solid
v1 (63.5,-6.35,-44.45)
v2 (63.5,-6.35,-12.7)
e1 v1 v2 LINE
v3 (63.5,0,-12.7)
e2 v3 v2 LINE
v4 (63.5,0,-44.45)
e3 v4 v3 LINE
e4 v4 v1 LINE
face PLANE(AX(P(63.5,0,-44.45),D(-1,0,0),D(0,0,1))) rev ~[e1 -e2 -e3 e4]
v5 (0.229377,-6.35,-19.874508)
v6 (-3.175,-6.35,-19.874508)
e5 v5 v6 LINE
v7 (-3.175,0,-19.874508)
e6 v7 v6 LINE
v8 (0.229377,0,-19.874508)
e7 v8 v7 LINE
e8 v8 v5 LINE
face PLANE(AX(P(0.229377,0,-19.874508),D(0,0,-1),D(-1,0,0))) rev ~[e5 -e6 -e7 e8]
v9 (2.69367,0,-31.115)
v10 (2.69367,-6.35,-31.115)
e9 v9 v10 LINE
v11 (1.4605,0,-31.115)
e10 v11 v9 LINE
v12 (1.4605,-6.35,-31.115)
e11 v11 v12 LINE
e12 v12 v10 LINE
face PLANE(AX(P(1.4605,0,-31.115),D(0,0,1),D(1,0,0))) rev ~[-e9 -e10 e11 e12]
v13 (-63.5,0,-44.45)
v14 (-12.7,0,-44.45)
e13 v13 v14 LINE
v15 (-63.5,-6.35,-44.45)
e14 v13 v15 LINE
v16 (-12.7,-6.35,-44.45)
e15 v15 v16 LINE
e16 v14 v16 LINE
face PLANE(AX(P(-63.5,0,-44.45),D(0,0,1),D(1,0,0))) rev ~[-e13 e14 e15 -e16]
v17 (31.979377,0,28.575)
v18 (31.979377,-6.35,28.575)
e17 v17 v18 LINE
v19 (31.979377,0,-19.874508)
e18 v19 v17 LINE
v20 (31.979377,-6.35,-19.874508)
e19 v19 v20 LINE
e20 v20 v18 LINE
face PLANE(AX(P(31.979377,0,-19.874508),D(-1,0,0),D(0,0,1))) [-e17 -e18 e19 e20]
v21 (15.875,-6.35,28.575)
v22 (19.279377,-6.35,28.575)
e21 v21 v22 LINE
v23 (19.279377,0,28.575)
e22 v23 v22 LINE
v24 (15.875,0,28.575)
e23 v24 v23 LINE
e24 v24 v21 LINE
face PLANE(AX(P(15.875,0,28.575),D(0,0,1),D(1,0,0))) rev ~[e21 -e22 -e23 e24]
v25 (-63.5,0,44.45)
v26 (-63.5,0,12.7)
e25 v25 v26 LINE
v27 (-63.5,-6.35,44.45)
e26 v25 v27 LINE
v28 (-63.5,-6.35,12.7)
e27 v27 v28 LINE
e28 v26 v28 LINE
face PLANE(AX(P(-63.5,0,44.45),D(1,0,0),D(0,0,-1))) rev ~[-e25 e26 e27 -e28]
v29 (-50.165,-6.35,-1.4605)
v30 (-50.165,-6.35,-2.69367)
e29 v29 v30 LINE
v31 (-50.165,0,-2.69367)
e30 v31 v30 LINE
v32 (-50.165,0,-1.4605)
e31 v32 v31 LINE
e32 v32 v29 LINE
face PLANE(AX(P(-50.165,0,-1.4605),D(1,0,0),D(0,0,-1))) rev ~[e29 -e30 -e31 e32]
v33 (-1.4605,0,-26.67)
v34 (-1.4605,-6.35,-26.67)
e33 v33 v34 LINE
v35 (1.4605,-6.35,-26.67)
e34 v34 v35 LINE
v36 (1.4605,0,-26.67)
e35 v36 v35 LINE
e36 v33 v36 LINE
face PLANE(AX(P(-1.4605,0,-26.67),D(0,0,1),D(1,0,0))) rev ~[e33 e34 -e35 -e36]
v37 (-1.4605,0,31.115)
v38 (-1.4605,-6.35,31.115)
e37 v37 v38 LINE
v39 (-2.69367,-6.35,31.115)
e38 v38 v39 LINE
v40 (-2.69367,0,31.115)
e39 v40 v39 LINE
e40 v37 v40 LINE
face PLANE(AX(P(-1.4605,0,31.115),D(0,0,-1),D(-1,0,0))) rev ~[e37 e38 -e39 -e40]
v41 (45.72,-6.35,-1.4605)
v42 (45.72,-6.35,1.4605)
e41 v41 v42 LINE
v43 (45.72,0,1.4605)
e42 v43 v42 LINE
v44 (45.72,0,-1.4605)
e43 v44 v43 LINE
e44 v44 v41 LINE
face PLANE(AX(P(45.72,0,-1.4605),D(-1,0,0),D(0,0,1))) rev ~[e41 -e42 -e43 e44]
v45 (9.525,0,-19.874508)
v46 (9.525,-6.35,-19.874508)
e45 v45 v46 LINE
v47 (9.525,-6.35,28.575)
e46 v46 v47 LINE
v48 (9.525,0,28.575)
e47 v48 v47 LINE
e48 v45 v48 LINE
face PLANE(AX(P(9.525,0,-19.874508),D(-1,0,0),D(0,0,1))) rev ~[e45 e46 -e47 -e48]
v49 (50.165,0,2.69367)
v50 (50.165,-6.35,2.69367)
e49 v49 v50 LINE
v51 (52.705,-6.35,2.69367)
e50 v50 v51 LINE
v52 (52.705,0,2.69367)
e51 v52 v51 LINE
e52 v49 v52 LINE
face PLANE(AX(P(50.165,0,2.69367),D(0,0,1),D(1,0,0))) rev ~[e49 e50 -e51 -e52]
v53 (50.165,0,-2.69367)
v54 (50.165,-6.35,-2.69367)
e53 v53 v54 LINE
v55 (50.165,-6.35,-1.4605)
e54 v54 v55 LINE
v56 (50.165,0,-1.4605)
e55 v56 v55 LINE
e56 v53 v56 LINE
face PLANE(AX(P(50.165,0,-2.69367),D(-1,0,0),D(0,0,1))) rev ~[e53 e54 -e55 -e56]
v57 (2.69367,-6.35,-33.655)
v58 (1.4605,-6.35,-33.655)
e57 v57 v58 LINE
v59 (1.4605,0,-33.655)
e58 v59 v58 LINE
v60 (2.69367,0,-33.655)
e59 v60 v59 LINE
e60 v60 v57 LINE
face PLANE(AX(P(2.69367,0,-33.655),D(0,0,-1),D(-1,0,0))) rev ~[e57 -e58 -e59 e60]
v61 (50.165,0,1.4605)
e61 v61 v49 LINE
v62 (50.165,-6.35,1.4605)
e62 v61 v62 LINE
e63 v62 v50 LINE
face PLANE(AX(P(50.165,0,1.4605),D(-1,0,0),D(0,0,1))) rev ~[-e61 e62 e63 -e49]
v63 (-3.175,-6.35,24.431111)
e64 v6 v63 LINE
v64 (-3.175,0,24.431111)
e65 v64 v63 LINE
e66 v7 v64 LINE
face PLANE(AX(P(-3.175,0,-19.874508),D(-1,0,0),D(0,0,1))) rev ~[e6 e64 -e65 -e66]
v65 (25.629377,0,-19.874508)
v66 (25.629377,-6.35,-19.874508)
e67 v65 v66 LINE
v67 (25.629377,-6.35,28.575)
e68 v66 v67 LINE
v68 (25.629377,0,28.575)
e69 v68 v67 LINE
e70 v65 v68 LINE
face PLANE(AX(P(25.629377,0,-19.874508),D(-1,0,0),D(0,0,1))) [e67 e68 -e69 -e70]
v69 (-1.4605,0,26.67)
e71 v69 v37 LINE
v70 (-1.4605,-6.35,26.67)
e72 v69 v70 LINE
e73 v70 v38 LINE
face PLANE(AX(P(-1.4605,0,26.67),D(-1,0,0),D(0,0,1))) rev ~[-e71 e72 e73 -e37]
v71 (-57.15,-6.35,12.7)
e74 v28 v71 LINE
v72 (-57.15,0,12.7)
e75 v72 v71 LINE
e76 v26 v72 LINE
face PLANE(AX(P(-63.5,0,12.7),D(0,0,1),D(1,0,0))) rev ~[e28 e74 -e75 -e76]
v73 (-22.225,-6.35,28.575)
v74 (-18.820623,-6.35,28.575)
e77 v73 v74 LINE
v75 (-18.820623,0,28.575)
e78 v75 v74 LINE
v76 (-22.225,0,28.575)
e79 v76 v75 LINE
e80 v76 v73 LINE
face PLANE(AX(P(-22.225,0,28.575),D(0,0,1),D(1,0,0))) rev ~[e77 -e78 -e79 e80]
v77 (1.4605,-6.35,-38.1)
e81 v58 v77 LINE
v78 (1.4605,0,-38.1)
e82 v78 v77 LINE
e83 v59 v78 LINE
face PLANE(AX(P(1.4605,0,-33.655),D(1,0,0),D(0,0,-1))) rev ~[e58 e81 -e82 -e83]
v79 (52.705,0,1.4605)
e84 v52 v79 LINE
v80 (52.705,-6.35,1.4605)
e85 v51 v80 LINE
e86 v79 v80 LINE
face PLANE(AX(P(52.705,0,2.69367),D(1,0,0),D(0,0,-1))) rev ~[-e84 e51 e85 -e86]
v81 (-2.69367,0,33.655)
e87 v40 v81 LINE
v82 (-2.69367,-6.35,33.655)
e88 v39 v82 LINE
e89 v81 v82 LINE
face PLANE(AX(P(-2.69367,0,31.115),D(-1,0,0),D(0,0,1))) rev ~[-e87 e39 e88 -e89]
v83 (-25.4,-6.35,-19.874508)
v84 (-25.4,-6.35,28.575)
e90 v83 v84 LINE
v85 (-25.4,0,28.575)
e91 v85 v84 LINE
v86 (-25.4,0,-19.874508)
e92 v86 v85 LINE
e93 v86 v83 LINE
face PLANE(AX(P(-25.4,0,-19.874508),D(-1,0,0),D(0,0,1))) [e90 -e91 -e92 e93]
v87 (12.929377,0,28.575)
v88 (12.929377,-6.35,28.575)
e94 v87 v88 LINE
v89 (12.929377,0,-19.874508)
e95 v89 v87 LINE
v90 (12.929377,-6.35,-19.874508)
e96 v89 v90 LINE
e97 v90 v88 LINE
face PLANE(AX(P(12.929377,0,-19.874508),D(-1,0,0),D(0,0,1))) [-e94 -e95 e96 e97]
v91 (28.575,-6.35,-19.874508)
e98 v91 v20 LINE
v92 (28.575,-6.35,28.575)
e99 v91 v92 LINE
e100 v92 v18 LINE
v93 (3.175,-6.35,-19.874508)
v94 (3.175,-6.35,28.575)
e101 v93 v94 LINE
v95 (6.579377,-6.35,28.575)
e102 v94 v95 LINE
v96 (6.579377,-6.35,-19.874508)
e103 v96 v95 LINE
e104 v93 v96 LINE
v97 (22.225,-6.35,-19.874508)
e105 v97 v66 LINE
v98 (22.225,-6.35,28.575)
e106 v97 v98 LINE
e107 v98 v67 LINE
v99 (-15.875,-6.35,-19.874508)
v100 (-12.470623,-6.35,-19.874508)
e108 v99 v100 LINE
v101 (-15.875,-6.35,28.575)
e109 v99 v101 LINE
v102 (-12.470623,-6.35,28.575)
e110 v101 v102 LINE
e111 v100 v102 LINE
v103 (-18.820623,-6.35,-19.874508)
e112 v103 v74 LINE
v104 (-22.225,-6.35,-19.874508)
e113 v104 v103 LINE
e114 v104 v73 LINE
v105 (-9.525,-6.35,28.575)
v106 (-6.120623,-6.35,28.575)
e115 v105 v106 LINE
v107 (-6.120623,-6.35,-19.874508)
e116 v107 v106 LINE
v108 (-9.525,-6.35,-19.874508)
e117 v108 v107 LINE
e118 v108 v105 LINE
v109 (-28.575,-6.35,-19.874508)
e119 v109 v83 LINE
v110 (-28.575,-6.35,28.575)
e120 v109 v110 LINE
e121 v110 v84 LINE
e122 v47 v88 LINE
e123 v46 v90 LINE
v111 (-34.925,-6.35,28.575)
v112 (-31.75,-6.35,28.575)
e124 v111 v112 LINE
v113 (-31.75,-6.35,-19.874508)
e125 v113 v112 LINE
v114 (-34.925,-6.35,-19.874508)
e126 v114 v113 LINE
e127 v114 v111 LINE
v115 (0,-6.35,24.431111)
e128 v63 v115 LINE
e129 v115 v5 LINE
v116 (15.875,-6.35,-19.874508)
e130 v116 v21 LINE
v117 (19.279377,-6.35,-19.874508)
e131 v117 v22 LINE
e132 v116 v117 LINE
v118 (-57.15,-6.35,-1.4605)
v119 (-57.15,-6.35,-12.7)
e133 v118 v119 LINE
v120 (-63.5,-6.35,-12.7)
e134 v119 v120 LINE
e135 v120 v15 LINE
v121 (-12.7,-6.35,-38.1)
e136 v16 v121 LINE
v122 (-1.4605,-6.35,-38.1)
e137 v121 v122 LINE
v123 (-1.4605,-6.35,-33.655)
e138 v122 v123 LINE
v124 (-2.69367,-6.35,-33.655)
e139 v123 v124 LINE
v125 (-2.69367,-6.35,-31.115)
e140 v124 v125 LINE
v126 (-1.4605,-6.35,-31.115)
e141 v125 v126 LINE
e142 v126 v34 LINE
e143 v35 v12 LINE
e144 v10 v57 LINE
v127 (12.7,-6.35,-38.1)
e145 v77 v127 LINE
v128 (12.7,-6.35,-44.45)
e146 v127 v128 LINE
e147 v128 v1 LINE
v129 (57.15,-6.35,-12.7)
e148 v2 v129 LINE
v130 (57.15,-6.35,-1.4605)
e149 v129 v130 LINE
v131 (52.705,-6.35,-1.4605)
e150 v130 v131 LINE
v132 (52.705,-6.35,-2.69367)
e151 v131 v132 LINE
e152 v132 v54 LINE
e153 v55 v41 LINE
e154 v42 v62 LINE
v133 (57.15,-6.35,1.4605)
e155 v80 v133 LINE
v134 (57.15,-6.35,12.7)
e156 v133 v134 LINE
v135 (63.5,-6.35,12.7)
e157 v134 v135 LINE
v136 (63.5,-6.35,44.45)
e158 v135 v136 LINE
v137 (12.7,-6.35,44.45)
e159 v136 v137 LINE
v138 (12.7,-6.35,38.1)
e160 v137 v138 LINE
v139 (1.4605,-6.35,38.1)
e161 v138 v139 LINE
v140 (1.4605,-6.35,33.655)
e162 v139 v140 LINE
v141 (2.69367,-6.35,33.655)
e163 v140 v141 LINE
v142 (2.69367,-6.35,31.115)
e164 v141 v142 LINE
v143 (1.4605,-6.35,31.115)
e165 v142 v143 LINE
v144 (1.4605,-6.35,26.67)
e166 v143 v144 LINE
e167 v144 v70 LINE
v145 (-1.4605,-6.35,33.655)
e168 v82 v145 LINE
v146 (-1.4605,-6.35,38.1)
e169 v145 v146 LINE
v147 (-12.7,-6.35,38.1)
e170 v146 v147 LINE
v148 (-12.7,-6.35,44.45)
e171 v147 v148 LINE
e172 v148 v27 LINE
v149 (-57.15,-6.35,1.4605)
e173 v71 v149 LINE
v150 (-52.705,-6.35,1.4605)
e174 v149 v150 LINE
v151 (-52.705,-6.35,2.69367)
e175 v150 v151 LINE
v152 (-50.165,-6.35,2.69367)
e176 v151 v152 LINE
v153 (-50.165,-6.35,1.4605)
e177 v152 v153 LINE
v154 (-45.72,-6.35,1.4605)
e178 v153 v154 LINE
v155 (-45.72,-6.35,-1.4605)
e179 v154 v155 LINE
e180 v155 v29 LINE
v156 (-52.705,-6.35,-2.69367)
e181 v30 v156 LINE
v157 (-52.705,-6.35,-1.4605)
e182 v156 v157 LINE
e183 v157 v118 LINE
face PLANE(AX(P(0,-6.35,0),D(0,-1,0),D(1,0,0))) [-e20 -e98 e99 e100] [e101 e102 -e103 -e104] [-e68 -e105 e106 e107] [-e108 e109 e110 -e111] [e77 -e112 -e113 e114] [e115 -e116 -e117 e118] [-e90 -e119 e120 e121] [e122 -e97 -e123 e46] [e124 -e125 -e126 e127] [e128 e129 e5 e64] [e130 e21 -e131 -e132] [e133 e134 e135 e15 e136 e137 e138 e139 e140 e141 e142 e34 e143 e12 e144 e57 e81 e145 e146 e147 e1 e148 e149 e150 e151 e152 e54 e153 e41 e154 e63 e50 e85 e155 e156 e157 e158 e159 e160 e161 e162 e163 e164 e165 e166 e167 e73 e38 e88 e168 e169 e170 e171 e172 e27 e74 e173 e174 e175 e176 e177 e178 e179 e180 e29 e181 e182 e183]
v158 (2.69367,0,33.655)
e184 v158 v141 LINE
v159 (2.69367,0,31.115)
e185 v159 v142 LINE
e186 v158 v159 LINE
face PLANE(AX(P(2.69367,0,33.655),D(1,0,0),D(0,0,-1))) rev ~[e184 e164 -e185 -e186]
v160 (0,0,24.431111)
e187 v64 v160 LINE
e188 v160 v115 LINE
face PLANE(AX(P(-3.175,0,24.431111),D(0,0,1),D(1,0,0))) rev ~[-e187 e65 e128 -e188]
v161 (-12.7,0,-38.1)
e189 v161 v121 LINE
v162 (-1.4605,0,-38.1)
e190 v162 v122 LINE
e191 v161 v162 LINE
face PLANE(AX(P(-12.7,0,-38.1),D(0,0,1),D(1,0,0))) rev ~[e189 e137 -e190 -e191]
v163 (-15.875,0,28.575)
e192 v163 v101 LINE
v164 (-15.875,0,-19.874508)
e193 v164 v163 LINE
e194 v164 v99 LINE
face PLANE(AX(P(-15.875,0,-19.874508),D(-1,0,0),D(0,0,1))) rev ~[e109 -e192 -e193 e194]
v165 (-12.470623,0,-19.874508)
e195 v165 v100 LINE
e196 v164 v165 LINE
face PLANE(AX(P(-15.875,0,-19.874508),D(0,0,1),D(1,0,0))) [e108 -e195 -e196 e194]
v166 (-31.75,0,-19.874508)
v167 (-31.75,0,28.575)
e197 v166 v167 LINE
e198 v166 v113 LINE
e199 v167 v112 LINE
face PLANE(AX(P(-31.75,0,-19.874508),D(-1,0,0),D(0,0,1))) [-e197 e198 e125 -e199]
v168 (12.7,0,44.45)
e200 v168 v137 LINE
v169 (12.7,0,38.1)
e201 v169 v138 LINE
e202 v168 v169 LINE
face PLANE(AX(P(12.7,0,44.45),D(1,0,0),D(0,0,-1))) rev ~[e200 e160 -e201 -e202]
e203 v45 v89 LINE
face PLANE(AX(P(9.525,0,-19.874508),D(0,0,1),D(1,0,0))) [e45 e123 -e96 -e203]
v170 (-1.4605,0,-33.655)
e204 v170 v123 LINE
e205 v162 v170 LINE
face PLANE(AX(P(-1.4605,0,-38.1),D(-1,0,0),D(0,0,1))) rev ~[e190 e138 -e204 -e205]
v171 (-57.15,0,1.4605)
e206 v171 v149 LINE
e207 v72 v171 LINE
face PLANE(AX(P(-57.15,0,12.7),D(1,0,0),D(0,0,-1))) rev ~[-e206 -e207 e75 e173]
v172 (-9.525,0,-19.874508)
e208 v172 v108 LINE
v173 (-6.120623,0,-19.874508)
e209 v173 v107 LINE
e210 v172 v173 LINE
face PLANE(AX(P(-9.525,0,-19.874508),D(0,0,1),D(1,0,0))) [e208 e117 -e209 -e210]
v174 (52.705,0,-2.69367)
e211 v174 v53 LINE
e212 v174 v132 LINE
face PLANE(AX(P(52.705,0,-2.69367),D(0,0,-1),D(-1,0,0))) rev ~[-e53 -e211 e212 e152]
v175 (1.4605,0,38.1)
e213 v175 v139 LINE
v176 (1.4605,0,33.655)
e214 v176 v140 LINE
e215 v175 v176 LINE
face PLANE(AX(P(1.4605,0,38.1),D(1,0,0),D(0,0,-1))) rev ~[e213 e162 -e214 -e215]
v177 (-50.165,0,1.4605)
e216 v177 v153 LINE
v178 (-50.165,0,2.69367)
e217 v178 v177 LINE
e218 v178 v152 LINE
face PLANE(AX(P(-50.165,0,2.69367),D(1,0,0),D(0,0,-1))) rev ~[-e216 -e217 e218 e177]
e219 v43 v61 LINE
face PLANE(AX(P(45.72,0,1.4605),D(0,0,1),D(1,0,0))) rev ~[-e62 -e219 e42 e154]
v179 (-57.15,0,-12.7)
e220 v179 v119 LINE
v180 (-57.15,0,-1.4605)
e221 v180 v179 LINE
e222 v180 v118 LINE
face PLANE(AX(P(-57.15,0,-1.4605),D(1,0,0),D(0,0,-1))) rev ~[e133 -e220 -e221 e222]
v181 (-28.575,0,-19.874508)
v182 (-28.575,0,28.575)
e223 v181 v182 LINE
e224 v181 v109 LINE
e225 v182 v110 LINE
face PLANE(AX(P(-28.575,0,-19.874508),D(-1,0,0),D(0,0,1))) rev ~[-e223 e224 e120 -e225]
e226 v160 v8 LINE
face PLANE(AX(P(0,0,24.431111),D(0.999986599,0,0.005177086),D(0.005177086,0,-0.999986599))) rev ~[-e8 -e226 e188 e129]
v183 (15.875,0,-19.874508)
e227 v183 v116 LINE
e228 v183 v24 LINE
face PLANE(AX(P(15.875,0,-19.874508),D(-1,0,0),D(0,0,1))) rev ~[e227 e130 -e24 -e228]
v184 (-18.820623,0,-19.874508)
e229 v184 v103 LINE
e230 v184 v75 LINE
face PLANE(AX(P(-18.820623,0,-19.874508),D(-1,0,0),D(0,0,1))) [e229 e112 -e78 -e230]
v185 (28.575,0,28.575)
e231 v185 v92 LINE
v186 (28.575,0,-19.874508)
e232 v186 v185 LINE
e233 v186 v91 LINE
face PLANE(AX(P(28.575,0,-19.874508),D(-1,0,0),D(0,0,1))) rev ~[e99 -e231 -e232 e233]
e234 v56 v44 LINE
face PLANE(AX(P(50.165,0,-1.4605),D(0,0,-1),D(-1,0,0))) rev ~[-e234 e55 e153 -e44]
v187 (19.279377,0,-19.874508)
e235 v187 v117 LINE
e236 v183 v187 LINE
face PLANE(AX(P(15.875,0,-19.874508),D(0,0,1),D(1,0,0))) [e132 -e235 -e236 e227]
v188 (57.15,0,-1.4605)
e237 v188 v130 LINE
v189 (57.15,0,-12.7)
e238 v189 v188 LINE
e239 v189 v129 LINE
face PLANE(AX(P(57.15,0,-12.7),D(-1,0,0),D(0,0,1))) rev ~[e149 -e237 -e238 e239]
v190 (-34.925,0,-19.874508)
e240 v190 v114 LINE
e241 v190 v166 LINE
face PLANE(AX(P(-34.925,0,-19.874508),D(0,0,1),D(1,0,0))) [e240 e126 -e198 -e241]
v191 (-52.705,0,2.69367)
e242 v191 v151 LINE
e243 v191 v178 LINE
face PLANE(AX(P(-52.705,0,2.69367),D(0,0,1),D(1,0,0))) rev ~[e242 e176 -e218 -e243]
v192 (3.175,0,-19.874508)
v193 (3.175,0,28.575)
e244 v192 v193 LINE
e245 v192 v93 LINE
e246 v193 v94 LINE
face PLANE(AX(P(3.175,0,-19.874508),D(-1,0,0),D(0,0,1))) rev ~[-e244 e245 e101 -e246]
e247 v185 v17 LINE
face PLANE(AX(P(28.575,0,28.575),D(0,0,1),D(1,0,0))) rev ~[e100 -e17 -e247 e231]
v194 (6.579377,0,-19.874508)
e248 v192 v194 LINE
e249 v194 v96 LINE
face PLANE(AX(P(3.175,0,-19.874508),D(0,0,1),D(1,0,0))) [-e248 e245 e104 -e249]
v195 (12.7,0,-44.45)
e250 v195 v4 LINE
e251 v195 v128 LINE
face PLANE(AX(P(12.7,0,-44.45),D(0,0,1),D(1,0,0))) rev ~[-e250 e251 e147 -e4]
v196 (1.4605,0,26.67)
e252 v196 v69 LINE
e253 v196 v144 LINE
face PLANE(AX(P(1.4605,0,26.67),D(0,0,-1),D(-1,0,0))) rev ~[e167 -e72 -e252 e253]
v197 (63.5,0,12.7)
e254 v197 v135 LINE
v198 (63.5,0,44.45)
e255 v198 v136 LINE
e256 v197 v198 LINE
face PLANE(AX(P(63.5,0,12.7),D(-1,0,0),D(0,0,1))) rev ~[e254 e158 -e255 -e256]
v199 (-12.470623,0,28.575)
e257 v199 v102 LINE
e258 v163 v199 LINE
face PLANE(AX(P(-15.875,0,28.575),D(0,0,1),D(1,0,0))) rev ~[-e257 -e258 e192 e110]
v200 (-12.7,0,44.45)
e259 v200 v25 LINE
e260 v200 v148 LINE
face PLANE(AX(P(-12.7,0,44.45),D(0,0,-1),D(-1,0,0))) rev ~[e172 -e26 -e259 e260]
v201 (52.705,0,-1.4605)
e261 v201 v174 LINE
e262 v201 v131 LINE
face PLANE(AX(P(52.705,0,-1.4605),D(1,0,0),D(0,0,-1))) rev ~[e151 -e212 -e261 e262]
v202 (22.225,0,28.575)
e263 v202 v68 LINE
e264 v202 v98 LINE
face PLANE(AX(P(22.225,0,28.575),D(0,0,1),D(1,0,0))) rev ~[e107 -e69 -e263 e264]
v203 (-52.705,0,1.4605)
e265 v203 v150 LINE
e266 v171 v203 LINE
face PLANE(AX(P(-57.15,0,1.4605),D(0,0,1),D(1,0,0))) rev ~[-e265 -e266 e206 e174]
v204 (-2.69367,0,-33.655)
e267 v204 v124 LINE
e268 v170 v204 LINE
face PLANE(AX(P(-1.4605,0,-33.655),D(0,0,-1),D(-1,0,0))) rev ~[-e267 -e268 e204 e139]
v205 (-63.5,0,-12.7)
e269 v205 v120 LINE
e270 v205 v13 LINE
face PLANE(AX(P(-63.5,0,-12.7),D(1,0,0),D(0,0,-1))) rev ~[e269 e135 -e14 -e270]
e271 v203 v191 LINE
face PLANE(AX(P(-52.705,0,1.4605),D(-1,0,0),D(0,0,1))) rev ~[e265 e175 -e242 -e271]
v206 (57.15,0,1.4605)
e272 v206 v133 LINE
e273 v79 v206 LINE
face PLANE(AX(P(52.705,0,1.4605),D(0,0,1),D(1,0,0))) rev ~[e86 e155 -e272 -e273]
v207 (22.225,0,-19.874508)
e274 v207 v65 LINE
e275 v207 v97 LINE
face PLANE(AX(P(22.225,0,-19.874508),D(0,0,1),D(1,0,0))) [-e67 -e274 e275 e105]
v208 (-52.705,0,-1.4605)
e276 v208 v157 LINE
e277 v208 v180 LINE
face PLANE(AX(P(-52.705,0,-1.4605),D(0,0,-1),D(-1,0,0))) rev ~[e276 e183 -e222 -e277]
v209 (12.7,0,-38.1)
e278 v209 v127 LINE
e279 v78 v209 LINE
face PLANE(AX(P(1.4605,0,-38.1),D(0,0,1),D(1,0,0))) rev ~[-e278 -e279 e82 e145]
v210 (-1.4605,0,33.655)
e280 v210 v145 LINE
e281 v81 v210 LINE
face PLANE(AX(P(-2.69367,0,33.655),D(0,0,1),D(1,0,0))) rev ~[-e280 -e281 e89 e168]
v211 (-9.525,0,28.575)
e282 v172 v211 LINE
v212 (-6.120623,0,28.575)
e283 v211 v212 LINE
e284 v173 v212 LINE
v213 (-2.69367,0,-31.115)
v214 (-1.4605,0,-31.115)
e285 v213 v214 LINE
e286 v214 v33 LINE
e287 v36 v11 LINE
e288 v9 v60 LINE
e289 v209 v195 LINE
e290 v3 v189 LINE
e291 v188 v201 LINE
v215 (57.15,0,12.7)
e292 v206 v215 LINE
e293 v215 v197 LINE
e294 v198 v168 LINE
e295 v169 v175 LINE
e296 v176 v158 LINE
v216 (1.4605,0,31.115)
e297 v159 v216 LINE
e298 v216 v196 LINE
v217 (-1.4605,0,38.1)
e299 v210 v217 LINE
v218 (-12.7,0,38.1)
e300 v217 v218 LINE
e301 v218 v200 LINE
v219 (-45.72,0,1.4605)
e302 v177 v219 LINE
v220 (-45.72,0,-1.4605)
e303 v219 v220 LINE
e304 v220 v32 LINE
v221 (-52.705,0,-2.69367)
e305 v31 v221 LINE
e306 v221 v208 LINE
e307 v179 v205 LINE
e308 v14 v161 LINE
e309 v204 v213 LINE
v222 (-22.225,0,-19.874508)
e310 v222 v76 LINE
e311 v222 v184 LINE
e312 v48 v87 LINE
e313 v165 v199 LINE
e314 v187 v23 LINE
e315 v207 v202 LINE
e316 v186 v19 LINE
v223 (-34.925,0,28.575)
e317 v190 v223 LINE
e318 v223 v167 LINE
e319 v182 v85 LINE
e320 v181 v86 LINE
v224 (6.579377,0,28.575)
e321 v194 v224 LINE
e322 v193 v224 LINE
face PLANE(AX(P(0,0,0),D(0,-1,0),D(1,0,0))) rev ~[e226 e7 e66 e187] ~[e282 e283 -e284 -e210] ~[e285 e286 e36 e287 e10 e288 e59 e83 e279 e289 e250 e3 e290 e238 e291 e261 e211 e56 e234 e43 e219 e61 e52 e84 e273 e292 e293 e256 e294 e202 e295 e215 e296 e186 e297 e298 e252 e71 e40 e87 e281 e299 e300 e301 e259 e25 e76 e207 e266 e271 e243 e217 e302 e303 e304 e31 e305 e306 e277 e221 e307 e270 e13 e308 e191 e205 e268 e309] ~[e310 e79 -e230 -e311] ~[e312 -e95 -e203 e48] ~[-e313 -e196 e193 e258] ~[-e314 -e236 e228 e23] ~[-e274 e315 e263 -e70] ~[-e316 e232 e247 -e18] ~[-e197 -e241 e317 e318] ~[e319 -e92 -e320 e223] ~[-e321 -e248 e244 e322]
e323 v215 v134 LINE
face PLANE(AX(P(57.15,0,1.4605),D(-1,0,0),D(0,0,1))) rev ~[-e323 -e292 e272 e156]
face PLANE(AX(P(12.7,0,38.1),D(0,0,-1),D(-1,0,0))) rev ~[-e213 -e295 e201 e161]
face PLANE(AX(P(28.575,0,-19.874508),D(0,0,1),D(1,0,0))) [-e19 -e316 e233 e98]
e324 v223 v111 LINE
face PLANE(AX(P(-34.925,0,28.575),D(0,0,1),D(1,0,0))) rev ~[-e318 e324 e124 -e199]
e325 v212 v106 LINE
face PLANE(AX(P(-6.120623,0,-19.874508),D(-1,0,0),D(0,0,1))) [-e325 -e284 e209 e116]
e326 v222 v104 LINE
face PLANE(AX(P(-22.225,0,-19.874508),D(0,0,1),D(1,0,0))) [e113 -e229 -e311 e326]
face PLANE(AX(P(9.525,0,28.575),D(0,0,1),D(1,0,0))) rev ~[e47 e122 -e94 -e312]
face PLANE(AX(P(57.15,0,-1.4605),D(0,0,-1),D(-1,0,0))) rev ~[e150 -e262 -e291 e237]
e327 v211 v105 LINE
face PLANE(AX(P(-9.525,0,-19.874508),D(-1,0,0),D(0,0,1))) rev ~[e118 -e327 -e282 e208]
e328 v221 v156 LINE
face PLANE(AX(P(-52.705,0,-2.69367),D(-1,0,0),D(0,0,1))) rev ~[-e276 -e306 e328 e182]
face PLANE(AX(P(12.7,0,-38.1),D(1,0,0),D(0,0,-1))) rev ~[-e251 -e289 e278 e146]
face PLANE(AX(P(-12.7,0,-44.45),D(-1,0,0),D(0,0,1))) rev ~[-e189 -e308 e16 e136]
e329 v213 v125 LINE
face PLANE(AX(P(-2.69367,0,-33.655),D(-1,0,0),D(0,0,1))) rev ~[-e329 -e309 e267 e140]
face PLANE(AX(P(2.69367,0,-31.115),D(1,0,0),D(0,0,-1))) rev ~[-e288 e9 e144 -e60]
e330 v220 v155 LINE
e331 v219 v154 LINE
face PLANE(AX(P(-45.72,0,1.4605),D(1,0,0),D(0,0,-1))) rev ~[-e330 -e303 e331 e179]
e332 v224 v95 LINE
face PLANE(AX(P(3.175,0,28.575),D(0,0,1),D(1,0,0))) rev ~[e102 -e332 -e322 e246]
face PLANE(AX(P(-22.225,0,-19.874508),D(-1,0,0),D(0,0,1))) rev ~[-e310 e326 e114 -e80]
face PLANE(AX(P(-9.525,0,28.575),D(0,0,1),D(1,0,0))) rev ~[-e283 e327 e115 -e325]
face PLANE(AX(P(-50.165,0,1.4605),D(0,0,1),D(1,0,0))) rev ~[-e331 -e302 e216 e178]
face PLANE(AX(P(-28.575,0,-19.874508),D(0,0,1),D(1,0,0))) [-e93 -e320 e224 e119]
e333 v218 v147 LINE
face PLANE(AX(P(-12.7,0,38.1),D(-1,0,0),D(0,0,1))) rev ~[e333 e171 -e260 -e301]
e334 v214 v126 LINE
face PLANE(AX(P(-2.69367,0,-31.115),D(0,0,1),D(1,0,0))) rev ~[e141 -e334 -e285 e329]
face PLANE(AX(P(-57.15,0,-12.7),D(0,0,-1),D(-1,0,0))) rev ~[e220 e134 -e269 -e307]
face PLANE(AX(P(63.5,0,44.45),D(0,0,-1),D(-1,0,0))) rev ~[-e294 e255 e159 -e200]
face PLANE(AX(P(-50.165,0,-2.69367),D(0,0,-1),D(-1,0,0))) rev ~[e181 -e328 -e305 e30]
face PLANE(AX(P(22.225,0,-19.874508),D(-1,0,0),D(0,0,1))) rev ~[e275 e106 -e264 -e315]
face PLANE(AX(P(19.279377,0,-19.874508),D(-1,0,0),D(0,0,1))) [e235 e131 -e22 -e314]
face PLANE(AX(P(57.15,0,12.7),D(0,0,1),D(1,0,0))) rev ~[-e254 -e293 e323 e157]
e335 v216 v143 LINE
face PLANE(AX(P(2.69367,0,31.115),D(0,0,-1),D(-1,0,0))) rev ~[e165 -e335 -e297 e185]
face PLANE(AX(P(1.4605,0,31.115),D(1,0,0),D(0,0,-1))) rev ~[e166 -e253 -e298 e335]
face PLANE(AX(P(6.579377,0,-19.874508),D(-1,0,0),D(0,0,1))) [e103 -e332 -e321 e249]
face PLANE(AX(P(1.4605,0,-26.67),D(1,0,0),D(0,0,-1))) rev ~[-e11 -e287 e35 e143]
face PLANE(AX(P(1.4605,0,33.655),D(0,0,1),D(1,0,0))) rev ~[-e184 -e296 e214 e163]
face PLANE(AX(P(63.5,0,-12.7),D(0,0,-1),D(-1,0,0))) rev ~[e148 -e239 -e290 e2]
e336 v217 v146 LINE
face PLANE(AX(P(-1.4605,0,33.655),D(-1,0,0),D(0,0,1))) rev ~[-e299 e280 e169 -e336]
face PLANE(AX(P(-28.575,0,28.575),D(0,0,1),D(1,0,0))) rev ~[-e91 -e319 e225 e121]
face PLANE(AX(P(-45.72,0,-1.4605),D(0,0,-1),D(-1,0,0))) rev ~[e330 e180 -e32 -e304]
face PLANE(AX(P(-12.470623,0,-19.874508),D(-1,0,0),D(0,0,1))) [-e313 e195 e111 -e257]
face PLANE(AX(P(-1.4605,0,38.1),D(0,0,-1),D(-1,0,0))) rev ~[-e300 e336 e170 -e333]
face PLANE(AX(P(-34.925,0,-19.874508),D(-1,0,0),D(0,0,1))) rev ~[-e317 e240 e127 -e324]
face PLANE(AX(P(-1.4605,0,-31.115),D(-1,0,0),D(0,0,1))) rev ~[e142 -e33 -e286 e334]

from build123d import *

# Parameters (mm, degrees)
F0_W     = 3.175
F0_H     = 48.4495080546
F0_W_2   = 3.4043772995
F1_DEPTH = 6.35


# Not quite as in the source:
# - a feature names something its author has since deleted; it is built from what else it names


with BuildPart() as f1:
    # F0 (on Front) → F1 (new body)
    with BuildSketch(Plane.XZ):
        Polygon((12.7, -44.45), (57.1500004709, -44.45), (63.5, -44.45), (63.5, -12.7), (57.1500004709, -12.7), (57.1500004709, -1.4605), (52.7050002354, -1.4605), (52.7050002354, -2.69367), (50.1650002354, -2.69367), (50.1650002354, -1.4605), (45.72, -1.4605), (45.72, 1.4605), (50.1650002354, 1.4605), (50.1650002354, 2.69367), (52.7050002354, 2.69367), (52.7050002354, 1.4605), (57.1500004709, 1.4605), (57.1500004709, 12.7), (63.5, 12.7), (63.5, 44.45), (57.1500004709, 44.45), (12.7, 44.45), (12.7, 38.1000004709), (1.4605, 38.1000004709), (1.4605, 33.6550002354), (2.69367, 33.6550002354), (2.69367, 31.1150002354), (1.4605, 31.1150002354), (1.4605, 26.67), (-1.4605, 26.67), (-1.4605, 31.1150002354), (-2.69367, 31.1150002354), (-2.69367, 33.6550002354), (-1.4605, 33.6550002354), (-1.4605, 38.1000004709), (-12.7, 38.1000004709), (-12.7, 44.45), (-57.1500004709, 44.45), (-63.5, 44.45), (-63.5, 12.7), (-57.1500004709, 12.7), (-57.1500004709, 1.4605), (-52.7050002354, 1.4605), (-52.7050002354, 2.69367), (-50.1650002354, 2.69367), (-50.1650002354, 1.4605), (-45.72, 1.4605), (-45.72, -1.4605), (-50.1650002354, -1.4605), (-50.1650002354, -2.69367), (-52.7050002354, -2.69367), (-52.7050002354, -1.4605), (-57.1500004709, -1.4605), (-57.1500004709, -2.69367), (-57.1500004709, -12.7), (-63.5, -12.7), (-63.5, -44.45), (-57.1500004709, -44.45), (-12.7, -44.45), (-12.7, -38.1000004709), (-1.4605, -38.1000004709), (-1.4605, -33.6550002354), (-2.69367, -33.6550002354), (-2.69367, -31.1150002354), (-1.4605, -31.1150002354), (-1.4605, -26.67), (1.4605, -26.67), (1.4605, -31.1150002354), (2.69367, -31.1150002354), (2.69367, -33.6550002354), (1.4605, -33.6550002354), (1.4605, -38.1000004709), (12.7, -38.1000004709), align=None)
        with Locations((-33.3375002354, 4.3502459727)):
            Rectangle(F0_W, F0_H, mode=Mode.SUBTRACT)
        with Locations((-26.9875002354, 4.3502459727)):
            Rectangle(F0_W, F0_H, mode=Mode.SUBTRACT)
        with Locations((-20.5228115857, 4.3502459727)):
            Rectangle(F0_W_2, F0_H, mode=Mode.SUBTRACT)
        with Locations((-14.1728115857, 4.3502459727)):
            Rectangle(F0_W_2, F0_H, mode=Mode.SUBTRACT)
        Polygon((0.2293770641, -19.8745080546), (-3.1750002354, -19.8745080546), (-3.1750002354, 24.4311112911), (0, 24.4311112911), align=None, mode=Mode.SUBTRACT)
        with Locations((-7.8228115857, 4.3502459727)):
            Rectangle(F0_W_2, F0_H, mode=Mode.SUBTRACT)
        with Locations((4.8771884143, 4.3502459727)):
            Rectangle(F0_W_2, F0_H, mode=Mode.SUBTRACT)
        with Locations((11.2271884143, 4.3502459727)):
            Rectangle(F0_W_2, F0_H, mode=Mode.SUBTRACT)
        with Locations((17.5771884143, 4.3502459727)):
            Rectangle(F0_W_2, F0_H, mode=Mode.SUBTRACT)
        with Locations((23.9271884143, 4.3502459727)):
            Rectangle(F0_W_2, F0_H, mode=Mode.SUBTRACT)
        with Locations((30.2771884143, 4.3502459727)):
            Rectangle(F0_W_2, F0_H, mode=Mode.SUBTRACT)
    extrude(amount=F1_DEPTH)


solid = f1.part
